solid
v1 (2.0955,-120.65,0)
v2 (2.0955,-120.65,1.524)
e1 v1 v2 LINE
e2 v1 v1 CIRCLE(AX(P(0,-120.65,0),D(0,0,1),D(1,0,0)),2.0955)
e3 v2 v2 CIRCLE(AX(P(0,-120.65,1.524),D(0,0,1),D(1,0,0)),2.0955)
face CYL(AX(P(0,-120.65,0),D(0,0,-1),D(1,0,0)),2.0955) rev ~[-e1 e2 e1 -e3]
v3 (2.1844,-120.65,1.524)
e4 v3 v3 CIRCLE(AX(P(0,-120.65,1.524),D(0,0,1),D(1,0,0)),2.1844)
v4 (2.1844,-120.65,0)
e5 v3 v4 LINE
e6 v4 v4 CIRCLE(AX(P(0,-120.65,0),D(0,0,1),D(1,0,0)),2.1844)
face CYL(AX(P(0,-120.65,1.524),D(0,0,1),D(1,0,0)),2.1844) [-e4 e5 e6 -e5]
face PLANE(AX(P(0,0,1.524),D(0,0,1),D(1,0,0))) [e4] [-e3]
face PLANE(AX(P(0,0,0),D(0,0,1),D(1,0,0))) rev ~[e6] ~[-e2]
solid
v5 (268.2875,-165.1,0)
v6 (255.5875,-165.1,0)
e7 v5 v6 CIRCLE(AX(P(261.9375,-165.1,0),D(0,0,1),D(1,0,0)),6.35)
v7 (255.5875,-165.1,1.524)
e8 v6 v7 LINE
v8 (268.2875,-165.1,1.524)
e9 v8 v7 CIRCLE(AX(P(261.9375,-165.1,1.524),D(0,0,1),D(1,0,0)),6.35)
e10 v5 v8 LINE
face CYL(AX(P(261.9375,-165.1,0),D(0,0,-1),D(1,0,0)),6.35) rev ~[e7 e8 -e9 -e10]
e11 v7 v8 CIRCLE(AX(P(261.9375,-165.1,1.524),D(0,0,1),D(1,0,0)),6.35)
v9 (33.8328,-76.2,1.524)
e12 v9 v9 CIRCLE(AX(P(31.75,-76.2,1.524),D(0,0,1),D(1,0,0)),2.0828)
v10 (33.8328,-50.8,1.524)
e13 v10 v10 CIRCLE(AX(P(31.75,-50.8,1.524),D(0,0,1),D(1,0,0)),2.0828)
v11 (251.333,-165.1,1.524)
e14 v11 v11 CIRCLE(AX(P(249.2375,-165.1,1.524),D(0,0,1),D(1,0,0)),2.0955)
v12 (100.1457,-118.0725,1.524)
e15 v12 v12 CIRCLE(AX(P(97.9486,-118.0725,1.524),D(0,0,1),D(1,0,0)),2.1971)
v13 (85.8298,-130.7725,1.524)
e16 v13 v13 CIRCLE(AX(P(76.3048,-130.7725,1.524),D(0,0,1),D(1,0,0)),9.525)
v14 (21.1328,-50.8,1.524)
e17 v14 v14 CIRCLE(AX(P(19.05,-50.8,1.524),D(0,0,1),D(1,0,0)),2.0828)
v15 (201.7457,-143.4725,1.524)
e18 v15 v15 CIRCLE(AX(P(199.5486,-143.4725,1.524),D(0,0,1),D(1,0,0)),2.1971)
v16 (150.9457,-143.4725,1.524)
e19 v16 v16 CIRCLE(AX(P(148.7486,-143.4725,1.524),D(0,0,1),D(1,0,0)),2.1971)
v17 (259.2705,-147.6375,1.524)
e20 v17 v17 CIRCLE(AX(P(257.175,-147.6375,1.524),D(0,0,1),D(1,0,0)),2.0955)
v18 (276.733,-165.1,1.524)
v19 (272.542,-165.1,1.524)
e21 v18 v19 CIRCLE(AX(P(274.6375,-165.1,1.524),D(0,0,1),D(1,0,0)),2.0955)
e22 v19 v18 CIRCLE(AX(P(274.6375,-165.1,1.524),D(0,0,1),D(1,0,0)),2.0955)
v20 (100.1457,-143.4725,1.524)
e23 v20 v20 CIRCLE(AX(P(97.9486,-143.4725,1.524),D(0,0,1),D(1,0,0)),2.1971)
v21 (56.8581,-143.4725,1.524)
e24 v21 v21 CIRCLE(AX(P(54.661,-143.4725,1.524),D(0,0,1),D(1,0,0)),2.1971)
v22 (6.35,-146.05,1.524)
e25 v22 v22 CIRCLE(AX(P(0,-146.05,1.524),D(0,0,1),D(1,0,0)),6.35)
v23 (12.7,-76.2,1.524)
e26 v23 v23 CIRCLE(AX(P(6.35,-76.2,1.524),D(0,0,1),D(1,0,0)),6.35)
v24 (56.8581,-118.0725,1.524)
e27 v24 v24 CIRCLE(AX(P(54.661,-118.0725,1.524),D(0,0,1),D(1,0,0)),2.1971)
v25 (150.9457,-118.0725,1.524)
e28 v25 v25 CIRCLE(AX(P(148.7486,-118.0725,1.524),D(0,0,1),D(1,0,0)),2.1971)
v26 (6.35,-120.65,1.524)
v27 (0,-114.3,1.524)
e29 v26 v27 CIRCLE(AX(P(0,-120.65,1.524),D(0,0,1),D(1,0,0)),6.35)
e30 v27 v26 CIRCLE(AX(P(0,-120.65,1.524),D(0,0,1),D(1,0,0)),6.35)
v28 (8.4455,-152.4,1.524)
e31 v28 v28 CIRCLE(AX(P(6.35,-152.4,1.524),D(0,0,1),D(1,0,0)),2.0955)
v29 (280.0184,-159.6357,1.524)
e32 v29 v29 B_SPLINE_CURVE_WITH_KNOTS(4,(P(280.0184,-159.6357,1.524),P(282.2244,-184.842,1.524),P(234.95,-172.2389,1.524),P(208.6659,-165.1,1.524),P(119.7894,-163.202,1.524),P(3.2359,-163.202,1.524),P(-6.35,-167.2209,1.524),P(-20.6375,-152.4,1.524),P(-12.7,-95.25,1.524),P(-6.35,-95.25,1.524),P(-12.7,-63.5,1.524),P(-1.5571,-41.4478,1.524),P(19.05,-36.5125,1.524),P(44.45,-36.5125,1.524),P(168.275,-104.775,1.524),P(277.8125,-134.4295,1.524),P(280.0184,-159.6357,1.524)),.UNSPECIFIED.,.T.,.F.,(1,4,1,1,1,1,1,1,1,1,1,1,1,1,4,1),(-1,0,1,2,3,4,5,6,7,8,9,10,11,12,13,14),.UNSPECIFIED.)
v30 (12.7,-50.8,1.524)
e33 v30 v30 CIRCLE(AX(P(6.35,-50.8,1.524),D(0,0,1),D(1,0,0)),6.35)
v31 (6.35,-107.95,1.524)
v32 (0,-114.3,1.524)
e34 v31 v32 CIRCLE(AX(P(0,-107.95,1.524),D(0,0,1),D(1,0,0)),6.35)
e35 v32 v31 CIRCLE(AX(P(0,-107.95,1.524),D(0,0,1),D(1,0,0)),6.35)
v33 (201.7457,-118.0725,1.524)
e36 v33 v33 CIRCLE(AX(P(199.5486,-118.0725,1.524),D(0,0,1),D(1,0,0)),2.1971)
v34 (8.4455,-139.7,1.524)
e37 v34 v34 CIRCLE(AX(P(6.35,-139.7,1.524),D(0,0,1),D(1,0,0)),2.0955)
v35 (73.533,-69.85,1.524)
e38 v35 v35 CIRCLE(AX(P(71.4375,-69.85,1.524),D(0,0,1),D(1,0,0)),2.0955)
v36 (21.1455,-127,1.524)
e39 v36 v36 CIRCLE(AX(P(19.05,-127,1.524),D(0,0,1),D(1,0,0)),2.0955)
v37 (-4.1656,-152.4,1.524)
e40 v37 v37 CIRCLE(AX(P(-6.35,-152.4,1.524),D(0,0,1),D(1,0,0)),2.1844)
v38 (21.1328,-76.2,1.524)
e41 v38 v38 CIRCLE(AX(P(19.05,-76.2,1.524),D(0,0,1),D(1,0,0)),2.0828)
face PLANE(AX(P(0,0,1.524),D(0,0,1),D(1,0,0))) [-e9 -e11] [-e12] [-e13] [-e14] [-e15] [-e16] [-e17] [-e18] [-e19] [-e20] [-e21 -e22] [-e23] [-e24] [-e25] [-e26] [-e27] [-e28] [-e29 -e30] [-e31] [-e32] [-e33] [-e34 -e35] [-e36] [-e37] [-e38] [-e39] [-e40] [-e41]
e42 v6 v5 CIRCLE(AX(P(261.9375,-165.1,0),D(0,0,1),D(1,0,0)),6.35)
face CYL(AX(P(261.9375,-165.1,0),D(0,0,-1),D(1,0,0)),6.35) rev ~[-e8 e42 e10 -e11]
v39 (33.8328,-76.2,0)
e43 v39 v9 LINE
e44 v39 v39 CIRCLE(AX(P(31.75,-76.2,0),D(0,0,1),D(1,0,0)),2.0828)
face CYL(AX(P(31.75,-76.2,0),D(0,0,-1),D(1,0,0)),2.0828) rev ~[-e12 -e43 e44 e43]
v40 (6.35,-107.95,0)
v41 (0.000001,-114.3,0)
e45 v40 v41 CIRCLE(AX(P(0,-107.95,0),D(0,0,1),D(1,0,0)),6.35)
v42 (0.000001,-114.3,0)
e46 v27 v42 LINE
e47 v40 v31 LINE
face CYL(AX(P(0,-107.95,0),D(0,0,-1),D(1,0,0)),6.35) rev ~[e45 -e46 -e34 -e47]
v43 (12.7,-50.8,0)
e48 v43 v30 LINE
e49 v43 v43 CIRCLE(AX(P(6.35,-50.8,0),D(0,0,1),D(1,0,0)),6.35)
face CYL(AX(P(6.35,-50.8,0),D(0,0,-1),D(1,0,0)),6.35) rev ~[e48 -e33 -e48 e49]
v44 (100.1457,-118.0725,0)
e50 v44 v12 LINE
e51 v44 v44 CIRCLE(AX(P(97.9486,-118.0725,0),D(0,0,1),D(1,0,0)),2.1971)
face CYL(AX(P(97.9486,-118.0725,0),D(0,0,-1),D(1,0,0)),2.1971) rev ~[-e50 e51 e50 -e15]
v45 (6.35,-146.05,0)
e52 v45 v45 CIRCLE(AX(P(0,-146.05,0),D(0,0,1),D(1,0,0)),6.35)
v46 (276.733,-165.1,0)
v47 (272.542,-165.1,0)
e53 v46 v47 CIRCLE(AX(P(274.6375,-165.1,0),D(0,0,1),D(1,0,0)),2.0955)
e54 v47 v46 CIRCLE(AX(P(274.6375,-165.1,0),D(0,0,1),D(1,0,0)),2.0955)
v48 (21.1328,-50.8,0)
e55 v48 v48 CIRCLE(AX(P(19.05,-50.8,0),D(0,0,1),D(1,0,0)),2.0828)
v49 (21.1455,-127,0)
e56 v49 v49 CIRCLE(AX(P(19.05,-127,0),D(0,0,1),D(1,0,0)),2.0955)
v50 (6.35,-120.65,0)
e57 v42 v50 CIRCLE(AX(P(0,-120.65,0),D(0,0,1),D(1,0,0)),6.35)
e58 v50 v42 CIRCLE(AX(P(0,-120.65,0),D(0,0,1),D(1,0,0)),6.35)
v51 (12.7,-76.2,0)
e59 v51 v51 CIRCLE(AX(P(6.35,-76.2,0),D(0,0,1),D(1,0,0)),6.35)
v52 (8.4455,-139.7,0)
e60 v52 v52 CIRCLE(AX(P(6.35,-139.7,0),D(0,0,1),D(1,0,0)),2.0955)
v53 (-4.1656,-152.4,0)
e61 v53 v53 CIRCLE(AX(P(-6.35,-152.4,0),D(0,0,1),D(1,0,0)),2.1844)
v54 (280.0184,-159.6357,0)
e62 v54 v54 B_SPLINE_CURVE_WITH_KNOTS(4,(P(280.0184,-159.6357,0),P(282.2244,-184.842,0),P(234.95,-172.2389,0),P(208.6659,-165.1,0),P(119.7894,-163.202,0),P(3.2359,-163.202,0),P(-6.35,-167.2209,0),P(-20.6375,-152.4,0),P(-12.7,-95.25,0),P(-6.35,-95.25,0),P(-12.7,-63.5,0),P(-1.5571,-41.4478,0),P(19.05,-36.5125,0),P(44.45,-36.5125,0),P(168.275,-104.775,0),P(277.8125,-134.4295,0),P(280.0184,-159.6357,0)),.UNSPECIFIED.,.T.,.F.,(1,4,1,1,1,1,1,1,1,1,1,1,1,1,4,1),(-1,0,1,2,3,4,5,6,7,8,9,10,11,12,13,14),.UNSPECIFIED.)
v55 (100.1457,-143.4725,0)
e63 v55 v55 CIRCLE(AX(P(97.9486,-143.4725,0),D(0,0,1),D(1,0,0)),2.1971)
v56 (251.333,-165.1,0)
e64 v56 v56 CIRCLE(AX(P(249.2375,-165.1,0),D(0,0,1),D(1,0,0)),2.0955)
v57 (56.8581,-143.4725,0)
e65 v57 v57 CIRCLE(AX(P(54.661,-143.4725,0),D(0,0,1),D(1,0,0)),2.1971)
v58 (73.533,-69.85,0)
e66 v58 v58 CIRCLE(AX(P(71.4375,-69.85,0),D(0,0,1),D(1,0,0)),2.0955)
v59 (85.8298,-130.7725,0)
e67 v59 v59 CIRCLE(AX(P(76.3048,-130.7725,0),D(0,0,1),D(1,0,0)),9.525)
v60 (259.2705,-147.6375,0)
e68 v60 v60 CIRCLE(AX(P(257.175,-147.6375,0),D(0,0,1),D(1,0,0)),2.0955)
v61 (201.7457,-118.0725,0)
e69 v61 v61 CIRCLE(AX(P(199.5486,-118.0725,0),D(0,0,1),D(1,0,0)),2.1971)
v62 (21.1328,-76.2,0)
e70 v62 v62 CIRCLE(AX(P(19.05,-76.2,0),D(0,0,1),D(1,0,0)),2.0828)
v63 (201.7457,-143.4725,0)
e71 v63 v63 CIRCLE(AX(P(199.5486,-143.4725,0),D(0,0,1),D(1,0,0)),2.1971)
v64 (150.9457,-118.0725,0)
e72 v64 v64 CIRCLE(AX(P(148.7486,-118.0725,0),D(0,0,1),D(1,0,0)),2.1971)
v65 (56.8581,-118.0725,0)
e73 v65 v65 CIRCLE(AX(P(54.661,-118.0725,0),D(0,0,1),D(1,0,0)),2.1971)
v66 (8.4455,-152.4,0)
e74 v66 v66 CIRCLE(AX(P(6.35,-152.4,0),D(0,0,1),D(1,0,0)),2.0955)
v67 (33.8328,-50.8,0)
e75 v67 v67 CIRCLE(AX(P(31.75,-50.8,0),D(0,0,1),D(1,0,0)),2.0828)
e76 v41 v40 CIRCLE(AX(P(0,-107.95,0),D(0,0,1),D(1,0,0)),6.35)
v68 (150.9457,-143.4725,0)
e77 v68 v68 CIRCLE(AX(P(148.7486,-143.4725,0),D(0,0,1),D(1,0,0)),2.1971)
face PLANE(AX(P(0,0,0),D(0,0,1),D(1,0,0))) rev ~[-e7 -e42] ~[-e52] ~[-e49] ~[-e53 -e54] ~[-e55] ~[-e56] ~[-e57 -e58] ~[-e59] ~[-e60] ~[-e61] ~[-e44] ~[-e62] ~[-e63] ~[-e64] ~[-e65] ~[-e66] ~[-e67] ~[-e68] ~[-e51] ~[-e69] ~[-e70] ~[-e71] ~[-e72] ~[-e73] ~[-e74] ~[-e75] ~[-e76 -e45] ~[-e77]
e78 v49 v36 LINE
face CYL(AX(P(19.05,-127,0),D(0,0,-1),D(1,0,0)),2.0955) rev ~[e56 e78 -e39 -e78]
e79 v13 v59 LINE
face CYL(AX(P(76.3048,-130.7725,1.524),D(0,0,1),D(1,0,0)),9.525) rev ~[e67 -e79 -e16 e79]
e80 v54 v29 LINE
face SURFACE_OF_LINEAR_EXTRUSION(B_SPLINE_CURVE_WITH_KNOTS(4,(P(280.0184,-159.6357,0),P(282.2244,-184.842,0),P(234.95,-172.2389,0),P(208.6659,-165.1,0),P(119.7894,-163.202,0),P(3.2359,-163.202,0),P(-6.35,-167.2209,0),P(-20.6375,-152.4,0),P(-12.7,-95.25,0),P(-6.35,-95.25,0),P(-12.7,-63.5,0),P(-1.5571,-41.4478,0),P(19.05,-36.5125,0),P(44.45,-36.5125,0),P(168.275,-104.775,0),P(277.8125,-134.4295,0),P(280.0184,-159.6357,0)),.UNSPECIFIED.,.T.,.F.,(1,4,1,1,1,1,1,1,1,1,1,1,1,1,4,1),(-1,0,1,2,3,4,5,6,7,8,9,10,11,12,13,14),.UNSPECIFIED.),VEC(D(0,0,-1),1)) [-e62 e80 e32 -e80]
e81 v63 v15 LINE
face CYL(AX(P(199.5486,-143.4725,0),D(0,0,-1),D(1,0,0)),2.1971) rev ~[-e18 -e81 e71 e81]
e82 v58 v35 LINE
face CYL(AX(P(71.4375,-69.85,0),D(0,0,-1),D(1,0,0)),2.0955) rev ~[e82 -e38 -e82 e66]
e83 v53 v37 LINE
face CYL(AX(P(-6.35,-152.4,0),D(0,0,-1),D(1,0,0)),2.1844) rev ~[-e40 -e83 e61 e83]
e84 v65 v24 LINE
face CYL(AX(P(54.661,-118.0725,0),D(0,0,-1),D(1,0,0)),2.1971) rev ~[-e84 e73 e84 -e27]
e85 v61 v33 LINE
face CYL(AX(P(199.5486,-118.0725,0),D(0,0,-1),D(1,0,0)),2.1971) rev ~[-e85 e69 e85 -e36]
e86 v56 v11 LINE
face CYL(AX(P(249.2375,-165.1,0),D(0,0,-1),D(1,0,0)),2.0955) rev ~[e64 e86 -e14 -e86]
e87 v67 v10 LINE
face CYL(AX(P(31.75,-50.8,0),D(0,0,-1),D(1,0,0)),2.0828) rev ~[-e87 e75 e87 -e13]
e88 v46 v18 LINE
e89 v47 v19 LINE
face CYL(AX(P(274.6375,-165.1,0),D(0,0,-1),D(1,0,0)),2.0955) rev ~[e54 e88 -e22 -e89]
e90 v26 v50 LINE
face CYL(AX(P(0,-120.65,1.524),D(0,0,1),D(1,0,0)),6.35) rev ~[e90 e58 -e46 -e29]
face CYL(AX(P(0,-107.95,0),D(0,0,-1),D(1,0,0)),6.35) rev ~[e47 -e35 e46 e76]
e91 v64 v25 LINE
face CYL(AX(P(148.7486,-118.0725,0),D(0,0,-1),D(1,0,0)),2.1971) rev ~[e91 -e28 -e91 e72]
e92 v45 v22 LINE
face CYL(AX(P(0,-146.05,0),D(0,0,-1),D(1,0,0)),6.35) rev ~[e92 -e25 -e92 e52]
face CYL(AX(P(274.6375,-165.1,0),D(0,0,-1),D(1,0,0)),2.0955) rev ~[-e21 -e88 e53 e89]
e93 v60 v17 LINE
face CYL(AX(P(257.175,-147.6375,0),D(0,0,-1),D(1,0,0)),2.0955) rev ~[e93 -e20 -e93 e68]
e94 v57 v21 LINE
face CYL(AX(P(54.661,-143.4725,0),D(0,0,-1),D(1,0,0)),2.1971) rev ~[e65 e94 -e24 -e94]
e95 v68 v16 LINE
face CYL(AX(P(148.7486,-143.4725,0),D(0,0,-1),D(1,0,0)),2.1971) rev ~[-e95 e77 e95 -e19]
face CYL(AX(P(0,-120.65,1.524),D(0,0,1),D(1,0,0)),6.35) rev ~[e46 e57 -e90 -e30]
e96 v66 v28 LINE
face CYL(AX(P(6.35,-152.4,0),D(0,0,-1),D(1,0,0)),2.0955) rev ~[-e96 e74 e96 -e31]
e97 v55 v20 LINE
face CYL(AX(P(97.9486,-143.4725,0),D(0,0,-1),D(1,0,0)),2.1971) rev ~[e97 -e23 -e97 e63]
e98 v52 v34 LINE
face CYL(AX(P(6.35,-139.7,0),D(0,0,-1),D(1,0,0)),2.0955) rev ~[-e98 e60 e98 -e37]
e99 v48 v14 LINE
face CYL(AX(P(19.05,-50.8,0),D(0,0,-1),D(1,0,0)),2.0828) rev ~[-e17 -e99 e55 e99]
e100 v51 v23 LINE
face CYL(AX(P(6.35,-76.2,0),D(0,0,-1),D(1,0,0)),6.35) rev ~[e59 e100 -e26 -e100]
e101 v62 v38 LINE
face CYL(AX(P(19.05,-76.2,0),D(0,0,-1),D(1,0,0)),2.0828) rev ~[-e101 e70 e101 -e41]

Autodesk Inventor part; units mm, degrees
ref_plane "YZ Plane" through (0, 0, 0) normal (1, 0, 0) x (0, 1, 0)
ref_plane "XZ Plane" through (0, 0, 0) normal (0, 1, 0) x (-1, 0, 0)
ref_plane "XY Plane" through (0, 0, 0) normal (0, 0, 1) x (1, 0, 0)
sketch "Sketch1" plane through (0, 0, 0) normal (0, 0, 1) x (1, 0, 0)
  circle A0 centre (261.9375, -165.1) radius 6.35
  circle A1 centre (-6.35, -152.4) radius 2.1844
  circle A2 centre (0, -146.05) radius 6.35
  circle A3 centre (6.35, -139.7) radius 2.0955
  circle A4 centre (0, -120.65) radius 2.0955
  circle A5 centre (0, -107.95) radius 6.35
  circle A6 centre (31.75, -50.8) radius 2.0828
  circle A7 centre (19.05, -50.8) radius 2.0828
  circle A8 centre (31.75, -76.2) radius 2.0828
  line L0 (280.0184, -159.6357) -> (282.2244, -184.842) construction
  line L1 (282.2244, -184.842) -> (234.95, -172.2389) construction
  line L2 (234.95, -172.2389) -> (208.6659, -165.1) construction
  line L3 (208.6659, -165.1) -> (119.7894, -163.202) construction
  line L4 (119.7894, -163.202) -> (3.2359, -163.202) construction
  line L5 (3.2359, -163.202) -> (-6.35, -167.2209) construction
  line L6 (-6.35, -167.2209) -> (-20.6375, -152.4) construction
  line L7 (-20.6375, -152.4) -> (-12.7, -95.25) construction
  line L8 (-12.7, -95.25) -> (-6.35, -95.25) construction
  line L9 (-6.35, -95.25) -> (-12.7, -63.5) construction
  line L10 (-12.7, -63.5) -> (-1.5571, -41.4478) construction
  line L11 (-1.5571, -41.4478) -> (19.05, -36.5125) construction
  line L12 (19.05, -36.5125) -> (44.45, -36.5125) construction
  line L13 (44.45, -36.5125) -> (168.275, -104.775) construction
  line L14 (168.275, -104.775) -> (277.8125, -134.4295) construction
  line L15 (277.8125, -134.4295) -> (280.0184, -159.6357) construction
  spline S0 degree 4 poles (280.0184, -159.6357) (282.2244, -184.842) (234.95, -172.2389) (208.6659, -165.1) (119.7894, -163.202) (3.2359, -163.202) (-6.35, -167.2209) (-20.6375, -152.4) (-12.7, -95.25) (-6.35, -95.25) (-12.7, -63.5) (-1.5571, -41.4478) (19.05, -36.5125) (44.45, -36.5125) (168.275, -104.775) (277.8125, -134.4295) (280.0184, -159.6357) knots 0 0 0 0 0 1 2 3 4 5 6 7 8 9 10 11 12 13 13 13 13 13
  line L16 (261.9375, -165.1) -> (274.6375, -165.1)
  line L17 (261.9375, -165.1) -> (249.2375, -165.1)
  circle A9 centre (274.6375, -165.1) radius 2.0955
  circle A10 centre (249.2375, -165.1) radius 2.0955
  circle A11 centre (257.175, -147.6375) radius 2.0955
  circle A12 centre (6.35, -50.8) radius 6.35
  circle A13 centre (6.35, -76.2) radius 6.35
  circle A14 centre (19.05, -76.2) radius 2.0828
  circle A15 centre (19.05, -127) radius 2.0955
  circle A16 centre (6.35, -152.4) radius 2.0955
  circle A17 centre (71.4375, -69.85) radius 2.0955
  circle A18 centre (199.5486, -118.0725) radius 2.1971 projected
  circle A19 centre (199.5486, -143.4725) radius 2.1971 projected
  circle A20 centre (148.7486, -118.0725) radius 2.1971 projected
  circle A21 centre (148.7486, -143.4725) radius 2.1971 projected
  circle A22 centre (97.9486, -118.0725) radius 2.1971 projected
  circle A23 centre (97.9486, -143.4725) radius 2.1971 projected
  circle A24 centre (54.661, -118.0725) radius 2.1971 projected
  circle A25 centre (54.661, -143.4725) radius 2.1971 projected
  point P0 (0, 0)
  dimension "d0" = 12.7
  dimension "d1" = 12.7
  dimension "d2" = 12.7
  dimension "d3" = 4.191
  dimension "d4" = 4.191
  dimension "d7" = 4.191
  dimension "d8" = 12.7
  dimension "d9" = 4.191
  dimension "d10" = 4.191
  dimension "d11" = 4.191
  dimension "d12" = 4.191
  dimension "d13" = 12.7
  dimension "d14" = 4.1656
  dimension "d15" = 4.1656
  dimension "d16" = 4.1656
  dimension "d17" = 4.1656
  dimension "d18" = 12.7
  dimension "d19" = 12.7
  dimension "d22" = 4.191
extrude "Extrusion3" add sketch "Sketch1" along normal blind 1.524
sketch "Sketch2" plane through (0, 0, 1.524) normal (0, 0, 1) x (1, 0, 0)
  circle A0 centre (0, -120.65) radius 2.1844 projected
  circle A1 centre (0, -120.65) radius 2.0955 projected
  circle A2 centre (0, -120.65) radius 6.35
  point P0 (0, 0)
  dimension "d27" = 12.7
extrude "Extrusion4" cut sketch "Sketch2" against normal blind 25.4 contours A2
sketch "Sketch3" plane through (0, 0, 1.524) normal (0, 0, 1) x (1, 0, 0)
  circle A0 centre (76.3048, -130.7725) radius 9.525
  point P0 (0, 0)
  dimension "d30" = 19.05
extrude "Extrusion5" cut sketch "Sketch3" against normal blind 25.4
properties part number "back-tower"
